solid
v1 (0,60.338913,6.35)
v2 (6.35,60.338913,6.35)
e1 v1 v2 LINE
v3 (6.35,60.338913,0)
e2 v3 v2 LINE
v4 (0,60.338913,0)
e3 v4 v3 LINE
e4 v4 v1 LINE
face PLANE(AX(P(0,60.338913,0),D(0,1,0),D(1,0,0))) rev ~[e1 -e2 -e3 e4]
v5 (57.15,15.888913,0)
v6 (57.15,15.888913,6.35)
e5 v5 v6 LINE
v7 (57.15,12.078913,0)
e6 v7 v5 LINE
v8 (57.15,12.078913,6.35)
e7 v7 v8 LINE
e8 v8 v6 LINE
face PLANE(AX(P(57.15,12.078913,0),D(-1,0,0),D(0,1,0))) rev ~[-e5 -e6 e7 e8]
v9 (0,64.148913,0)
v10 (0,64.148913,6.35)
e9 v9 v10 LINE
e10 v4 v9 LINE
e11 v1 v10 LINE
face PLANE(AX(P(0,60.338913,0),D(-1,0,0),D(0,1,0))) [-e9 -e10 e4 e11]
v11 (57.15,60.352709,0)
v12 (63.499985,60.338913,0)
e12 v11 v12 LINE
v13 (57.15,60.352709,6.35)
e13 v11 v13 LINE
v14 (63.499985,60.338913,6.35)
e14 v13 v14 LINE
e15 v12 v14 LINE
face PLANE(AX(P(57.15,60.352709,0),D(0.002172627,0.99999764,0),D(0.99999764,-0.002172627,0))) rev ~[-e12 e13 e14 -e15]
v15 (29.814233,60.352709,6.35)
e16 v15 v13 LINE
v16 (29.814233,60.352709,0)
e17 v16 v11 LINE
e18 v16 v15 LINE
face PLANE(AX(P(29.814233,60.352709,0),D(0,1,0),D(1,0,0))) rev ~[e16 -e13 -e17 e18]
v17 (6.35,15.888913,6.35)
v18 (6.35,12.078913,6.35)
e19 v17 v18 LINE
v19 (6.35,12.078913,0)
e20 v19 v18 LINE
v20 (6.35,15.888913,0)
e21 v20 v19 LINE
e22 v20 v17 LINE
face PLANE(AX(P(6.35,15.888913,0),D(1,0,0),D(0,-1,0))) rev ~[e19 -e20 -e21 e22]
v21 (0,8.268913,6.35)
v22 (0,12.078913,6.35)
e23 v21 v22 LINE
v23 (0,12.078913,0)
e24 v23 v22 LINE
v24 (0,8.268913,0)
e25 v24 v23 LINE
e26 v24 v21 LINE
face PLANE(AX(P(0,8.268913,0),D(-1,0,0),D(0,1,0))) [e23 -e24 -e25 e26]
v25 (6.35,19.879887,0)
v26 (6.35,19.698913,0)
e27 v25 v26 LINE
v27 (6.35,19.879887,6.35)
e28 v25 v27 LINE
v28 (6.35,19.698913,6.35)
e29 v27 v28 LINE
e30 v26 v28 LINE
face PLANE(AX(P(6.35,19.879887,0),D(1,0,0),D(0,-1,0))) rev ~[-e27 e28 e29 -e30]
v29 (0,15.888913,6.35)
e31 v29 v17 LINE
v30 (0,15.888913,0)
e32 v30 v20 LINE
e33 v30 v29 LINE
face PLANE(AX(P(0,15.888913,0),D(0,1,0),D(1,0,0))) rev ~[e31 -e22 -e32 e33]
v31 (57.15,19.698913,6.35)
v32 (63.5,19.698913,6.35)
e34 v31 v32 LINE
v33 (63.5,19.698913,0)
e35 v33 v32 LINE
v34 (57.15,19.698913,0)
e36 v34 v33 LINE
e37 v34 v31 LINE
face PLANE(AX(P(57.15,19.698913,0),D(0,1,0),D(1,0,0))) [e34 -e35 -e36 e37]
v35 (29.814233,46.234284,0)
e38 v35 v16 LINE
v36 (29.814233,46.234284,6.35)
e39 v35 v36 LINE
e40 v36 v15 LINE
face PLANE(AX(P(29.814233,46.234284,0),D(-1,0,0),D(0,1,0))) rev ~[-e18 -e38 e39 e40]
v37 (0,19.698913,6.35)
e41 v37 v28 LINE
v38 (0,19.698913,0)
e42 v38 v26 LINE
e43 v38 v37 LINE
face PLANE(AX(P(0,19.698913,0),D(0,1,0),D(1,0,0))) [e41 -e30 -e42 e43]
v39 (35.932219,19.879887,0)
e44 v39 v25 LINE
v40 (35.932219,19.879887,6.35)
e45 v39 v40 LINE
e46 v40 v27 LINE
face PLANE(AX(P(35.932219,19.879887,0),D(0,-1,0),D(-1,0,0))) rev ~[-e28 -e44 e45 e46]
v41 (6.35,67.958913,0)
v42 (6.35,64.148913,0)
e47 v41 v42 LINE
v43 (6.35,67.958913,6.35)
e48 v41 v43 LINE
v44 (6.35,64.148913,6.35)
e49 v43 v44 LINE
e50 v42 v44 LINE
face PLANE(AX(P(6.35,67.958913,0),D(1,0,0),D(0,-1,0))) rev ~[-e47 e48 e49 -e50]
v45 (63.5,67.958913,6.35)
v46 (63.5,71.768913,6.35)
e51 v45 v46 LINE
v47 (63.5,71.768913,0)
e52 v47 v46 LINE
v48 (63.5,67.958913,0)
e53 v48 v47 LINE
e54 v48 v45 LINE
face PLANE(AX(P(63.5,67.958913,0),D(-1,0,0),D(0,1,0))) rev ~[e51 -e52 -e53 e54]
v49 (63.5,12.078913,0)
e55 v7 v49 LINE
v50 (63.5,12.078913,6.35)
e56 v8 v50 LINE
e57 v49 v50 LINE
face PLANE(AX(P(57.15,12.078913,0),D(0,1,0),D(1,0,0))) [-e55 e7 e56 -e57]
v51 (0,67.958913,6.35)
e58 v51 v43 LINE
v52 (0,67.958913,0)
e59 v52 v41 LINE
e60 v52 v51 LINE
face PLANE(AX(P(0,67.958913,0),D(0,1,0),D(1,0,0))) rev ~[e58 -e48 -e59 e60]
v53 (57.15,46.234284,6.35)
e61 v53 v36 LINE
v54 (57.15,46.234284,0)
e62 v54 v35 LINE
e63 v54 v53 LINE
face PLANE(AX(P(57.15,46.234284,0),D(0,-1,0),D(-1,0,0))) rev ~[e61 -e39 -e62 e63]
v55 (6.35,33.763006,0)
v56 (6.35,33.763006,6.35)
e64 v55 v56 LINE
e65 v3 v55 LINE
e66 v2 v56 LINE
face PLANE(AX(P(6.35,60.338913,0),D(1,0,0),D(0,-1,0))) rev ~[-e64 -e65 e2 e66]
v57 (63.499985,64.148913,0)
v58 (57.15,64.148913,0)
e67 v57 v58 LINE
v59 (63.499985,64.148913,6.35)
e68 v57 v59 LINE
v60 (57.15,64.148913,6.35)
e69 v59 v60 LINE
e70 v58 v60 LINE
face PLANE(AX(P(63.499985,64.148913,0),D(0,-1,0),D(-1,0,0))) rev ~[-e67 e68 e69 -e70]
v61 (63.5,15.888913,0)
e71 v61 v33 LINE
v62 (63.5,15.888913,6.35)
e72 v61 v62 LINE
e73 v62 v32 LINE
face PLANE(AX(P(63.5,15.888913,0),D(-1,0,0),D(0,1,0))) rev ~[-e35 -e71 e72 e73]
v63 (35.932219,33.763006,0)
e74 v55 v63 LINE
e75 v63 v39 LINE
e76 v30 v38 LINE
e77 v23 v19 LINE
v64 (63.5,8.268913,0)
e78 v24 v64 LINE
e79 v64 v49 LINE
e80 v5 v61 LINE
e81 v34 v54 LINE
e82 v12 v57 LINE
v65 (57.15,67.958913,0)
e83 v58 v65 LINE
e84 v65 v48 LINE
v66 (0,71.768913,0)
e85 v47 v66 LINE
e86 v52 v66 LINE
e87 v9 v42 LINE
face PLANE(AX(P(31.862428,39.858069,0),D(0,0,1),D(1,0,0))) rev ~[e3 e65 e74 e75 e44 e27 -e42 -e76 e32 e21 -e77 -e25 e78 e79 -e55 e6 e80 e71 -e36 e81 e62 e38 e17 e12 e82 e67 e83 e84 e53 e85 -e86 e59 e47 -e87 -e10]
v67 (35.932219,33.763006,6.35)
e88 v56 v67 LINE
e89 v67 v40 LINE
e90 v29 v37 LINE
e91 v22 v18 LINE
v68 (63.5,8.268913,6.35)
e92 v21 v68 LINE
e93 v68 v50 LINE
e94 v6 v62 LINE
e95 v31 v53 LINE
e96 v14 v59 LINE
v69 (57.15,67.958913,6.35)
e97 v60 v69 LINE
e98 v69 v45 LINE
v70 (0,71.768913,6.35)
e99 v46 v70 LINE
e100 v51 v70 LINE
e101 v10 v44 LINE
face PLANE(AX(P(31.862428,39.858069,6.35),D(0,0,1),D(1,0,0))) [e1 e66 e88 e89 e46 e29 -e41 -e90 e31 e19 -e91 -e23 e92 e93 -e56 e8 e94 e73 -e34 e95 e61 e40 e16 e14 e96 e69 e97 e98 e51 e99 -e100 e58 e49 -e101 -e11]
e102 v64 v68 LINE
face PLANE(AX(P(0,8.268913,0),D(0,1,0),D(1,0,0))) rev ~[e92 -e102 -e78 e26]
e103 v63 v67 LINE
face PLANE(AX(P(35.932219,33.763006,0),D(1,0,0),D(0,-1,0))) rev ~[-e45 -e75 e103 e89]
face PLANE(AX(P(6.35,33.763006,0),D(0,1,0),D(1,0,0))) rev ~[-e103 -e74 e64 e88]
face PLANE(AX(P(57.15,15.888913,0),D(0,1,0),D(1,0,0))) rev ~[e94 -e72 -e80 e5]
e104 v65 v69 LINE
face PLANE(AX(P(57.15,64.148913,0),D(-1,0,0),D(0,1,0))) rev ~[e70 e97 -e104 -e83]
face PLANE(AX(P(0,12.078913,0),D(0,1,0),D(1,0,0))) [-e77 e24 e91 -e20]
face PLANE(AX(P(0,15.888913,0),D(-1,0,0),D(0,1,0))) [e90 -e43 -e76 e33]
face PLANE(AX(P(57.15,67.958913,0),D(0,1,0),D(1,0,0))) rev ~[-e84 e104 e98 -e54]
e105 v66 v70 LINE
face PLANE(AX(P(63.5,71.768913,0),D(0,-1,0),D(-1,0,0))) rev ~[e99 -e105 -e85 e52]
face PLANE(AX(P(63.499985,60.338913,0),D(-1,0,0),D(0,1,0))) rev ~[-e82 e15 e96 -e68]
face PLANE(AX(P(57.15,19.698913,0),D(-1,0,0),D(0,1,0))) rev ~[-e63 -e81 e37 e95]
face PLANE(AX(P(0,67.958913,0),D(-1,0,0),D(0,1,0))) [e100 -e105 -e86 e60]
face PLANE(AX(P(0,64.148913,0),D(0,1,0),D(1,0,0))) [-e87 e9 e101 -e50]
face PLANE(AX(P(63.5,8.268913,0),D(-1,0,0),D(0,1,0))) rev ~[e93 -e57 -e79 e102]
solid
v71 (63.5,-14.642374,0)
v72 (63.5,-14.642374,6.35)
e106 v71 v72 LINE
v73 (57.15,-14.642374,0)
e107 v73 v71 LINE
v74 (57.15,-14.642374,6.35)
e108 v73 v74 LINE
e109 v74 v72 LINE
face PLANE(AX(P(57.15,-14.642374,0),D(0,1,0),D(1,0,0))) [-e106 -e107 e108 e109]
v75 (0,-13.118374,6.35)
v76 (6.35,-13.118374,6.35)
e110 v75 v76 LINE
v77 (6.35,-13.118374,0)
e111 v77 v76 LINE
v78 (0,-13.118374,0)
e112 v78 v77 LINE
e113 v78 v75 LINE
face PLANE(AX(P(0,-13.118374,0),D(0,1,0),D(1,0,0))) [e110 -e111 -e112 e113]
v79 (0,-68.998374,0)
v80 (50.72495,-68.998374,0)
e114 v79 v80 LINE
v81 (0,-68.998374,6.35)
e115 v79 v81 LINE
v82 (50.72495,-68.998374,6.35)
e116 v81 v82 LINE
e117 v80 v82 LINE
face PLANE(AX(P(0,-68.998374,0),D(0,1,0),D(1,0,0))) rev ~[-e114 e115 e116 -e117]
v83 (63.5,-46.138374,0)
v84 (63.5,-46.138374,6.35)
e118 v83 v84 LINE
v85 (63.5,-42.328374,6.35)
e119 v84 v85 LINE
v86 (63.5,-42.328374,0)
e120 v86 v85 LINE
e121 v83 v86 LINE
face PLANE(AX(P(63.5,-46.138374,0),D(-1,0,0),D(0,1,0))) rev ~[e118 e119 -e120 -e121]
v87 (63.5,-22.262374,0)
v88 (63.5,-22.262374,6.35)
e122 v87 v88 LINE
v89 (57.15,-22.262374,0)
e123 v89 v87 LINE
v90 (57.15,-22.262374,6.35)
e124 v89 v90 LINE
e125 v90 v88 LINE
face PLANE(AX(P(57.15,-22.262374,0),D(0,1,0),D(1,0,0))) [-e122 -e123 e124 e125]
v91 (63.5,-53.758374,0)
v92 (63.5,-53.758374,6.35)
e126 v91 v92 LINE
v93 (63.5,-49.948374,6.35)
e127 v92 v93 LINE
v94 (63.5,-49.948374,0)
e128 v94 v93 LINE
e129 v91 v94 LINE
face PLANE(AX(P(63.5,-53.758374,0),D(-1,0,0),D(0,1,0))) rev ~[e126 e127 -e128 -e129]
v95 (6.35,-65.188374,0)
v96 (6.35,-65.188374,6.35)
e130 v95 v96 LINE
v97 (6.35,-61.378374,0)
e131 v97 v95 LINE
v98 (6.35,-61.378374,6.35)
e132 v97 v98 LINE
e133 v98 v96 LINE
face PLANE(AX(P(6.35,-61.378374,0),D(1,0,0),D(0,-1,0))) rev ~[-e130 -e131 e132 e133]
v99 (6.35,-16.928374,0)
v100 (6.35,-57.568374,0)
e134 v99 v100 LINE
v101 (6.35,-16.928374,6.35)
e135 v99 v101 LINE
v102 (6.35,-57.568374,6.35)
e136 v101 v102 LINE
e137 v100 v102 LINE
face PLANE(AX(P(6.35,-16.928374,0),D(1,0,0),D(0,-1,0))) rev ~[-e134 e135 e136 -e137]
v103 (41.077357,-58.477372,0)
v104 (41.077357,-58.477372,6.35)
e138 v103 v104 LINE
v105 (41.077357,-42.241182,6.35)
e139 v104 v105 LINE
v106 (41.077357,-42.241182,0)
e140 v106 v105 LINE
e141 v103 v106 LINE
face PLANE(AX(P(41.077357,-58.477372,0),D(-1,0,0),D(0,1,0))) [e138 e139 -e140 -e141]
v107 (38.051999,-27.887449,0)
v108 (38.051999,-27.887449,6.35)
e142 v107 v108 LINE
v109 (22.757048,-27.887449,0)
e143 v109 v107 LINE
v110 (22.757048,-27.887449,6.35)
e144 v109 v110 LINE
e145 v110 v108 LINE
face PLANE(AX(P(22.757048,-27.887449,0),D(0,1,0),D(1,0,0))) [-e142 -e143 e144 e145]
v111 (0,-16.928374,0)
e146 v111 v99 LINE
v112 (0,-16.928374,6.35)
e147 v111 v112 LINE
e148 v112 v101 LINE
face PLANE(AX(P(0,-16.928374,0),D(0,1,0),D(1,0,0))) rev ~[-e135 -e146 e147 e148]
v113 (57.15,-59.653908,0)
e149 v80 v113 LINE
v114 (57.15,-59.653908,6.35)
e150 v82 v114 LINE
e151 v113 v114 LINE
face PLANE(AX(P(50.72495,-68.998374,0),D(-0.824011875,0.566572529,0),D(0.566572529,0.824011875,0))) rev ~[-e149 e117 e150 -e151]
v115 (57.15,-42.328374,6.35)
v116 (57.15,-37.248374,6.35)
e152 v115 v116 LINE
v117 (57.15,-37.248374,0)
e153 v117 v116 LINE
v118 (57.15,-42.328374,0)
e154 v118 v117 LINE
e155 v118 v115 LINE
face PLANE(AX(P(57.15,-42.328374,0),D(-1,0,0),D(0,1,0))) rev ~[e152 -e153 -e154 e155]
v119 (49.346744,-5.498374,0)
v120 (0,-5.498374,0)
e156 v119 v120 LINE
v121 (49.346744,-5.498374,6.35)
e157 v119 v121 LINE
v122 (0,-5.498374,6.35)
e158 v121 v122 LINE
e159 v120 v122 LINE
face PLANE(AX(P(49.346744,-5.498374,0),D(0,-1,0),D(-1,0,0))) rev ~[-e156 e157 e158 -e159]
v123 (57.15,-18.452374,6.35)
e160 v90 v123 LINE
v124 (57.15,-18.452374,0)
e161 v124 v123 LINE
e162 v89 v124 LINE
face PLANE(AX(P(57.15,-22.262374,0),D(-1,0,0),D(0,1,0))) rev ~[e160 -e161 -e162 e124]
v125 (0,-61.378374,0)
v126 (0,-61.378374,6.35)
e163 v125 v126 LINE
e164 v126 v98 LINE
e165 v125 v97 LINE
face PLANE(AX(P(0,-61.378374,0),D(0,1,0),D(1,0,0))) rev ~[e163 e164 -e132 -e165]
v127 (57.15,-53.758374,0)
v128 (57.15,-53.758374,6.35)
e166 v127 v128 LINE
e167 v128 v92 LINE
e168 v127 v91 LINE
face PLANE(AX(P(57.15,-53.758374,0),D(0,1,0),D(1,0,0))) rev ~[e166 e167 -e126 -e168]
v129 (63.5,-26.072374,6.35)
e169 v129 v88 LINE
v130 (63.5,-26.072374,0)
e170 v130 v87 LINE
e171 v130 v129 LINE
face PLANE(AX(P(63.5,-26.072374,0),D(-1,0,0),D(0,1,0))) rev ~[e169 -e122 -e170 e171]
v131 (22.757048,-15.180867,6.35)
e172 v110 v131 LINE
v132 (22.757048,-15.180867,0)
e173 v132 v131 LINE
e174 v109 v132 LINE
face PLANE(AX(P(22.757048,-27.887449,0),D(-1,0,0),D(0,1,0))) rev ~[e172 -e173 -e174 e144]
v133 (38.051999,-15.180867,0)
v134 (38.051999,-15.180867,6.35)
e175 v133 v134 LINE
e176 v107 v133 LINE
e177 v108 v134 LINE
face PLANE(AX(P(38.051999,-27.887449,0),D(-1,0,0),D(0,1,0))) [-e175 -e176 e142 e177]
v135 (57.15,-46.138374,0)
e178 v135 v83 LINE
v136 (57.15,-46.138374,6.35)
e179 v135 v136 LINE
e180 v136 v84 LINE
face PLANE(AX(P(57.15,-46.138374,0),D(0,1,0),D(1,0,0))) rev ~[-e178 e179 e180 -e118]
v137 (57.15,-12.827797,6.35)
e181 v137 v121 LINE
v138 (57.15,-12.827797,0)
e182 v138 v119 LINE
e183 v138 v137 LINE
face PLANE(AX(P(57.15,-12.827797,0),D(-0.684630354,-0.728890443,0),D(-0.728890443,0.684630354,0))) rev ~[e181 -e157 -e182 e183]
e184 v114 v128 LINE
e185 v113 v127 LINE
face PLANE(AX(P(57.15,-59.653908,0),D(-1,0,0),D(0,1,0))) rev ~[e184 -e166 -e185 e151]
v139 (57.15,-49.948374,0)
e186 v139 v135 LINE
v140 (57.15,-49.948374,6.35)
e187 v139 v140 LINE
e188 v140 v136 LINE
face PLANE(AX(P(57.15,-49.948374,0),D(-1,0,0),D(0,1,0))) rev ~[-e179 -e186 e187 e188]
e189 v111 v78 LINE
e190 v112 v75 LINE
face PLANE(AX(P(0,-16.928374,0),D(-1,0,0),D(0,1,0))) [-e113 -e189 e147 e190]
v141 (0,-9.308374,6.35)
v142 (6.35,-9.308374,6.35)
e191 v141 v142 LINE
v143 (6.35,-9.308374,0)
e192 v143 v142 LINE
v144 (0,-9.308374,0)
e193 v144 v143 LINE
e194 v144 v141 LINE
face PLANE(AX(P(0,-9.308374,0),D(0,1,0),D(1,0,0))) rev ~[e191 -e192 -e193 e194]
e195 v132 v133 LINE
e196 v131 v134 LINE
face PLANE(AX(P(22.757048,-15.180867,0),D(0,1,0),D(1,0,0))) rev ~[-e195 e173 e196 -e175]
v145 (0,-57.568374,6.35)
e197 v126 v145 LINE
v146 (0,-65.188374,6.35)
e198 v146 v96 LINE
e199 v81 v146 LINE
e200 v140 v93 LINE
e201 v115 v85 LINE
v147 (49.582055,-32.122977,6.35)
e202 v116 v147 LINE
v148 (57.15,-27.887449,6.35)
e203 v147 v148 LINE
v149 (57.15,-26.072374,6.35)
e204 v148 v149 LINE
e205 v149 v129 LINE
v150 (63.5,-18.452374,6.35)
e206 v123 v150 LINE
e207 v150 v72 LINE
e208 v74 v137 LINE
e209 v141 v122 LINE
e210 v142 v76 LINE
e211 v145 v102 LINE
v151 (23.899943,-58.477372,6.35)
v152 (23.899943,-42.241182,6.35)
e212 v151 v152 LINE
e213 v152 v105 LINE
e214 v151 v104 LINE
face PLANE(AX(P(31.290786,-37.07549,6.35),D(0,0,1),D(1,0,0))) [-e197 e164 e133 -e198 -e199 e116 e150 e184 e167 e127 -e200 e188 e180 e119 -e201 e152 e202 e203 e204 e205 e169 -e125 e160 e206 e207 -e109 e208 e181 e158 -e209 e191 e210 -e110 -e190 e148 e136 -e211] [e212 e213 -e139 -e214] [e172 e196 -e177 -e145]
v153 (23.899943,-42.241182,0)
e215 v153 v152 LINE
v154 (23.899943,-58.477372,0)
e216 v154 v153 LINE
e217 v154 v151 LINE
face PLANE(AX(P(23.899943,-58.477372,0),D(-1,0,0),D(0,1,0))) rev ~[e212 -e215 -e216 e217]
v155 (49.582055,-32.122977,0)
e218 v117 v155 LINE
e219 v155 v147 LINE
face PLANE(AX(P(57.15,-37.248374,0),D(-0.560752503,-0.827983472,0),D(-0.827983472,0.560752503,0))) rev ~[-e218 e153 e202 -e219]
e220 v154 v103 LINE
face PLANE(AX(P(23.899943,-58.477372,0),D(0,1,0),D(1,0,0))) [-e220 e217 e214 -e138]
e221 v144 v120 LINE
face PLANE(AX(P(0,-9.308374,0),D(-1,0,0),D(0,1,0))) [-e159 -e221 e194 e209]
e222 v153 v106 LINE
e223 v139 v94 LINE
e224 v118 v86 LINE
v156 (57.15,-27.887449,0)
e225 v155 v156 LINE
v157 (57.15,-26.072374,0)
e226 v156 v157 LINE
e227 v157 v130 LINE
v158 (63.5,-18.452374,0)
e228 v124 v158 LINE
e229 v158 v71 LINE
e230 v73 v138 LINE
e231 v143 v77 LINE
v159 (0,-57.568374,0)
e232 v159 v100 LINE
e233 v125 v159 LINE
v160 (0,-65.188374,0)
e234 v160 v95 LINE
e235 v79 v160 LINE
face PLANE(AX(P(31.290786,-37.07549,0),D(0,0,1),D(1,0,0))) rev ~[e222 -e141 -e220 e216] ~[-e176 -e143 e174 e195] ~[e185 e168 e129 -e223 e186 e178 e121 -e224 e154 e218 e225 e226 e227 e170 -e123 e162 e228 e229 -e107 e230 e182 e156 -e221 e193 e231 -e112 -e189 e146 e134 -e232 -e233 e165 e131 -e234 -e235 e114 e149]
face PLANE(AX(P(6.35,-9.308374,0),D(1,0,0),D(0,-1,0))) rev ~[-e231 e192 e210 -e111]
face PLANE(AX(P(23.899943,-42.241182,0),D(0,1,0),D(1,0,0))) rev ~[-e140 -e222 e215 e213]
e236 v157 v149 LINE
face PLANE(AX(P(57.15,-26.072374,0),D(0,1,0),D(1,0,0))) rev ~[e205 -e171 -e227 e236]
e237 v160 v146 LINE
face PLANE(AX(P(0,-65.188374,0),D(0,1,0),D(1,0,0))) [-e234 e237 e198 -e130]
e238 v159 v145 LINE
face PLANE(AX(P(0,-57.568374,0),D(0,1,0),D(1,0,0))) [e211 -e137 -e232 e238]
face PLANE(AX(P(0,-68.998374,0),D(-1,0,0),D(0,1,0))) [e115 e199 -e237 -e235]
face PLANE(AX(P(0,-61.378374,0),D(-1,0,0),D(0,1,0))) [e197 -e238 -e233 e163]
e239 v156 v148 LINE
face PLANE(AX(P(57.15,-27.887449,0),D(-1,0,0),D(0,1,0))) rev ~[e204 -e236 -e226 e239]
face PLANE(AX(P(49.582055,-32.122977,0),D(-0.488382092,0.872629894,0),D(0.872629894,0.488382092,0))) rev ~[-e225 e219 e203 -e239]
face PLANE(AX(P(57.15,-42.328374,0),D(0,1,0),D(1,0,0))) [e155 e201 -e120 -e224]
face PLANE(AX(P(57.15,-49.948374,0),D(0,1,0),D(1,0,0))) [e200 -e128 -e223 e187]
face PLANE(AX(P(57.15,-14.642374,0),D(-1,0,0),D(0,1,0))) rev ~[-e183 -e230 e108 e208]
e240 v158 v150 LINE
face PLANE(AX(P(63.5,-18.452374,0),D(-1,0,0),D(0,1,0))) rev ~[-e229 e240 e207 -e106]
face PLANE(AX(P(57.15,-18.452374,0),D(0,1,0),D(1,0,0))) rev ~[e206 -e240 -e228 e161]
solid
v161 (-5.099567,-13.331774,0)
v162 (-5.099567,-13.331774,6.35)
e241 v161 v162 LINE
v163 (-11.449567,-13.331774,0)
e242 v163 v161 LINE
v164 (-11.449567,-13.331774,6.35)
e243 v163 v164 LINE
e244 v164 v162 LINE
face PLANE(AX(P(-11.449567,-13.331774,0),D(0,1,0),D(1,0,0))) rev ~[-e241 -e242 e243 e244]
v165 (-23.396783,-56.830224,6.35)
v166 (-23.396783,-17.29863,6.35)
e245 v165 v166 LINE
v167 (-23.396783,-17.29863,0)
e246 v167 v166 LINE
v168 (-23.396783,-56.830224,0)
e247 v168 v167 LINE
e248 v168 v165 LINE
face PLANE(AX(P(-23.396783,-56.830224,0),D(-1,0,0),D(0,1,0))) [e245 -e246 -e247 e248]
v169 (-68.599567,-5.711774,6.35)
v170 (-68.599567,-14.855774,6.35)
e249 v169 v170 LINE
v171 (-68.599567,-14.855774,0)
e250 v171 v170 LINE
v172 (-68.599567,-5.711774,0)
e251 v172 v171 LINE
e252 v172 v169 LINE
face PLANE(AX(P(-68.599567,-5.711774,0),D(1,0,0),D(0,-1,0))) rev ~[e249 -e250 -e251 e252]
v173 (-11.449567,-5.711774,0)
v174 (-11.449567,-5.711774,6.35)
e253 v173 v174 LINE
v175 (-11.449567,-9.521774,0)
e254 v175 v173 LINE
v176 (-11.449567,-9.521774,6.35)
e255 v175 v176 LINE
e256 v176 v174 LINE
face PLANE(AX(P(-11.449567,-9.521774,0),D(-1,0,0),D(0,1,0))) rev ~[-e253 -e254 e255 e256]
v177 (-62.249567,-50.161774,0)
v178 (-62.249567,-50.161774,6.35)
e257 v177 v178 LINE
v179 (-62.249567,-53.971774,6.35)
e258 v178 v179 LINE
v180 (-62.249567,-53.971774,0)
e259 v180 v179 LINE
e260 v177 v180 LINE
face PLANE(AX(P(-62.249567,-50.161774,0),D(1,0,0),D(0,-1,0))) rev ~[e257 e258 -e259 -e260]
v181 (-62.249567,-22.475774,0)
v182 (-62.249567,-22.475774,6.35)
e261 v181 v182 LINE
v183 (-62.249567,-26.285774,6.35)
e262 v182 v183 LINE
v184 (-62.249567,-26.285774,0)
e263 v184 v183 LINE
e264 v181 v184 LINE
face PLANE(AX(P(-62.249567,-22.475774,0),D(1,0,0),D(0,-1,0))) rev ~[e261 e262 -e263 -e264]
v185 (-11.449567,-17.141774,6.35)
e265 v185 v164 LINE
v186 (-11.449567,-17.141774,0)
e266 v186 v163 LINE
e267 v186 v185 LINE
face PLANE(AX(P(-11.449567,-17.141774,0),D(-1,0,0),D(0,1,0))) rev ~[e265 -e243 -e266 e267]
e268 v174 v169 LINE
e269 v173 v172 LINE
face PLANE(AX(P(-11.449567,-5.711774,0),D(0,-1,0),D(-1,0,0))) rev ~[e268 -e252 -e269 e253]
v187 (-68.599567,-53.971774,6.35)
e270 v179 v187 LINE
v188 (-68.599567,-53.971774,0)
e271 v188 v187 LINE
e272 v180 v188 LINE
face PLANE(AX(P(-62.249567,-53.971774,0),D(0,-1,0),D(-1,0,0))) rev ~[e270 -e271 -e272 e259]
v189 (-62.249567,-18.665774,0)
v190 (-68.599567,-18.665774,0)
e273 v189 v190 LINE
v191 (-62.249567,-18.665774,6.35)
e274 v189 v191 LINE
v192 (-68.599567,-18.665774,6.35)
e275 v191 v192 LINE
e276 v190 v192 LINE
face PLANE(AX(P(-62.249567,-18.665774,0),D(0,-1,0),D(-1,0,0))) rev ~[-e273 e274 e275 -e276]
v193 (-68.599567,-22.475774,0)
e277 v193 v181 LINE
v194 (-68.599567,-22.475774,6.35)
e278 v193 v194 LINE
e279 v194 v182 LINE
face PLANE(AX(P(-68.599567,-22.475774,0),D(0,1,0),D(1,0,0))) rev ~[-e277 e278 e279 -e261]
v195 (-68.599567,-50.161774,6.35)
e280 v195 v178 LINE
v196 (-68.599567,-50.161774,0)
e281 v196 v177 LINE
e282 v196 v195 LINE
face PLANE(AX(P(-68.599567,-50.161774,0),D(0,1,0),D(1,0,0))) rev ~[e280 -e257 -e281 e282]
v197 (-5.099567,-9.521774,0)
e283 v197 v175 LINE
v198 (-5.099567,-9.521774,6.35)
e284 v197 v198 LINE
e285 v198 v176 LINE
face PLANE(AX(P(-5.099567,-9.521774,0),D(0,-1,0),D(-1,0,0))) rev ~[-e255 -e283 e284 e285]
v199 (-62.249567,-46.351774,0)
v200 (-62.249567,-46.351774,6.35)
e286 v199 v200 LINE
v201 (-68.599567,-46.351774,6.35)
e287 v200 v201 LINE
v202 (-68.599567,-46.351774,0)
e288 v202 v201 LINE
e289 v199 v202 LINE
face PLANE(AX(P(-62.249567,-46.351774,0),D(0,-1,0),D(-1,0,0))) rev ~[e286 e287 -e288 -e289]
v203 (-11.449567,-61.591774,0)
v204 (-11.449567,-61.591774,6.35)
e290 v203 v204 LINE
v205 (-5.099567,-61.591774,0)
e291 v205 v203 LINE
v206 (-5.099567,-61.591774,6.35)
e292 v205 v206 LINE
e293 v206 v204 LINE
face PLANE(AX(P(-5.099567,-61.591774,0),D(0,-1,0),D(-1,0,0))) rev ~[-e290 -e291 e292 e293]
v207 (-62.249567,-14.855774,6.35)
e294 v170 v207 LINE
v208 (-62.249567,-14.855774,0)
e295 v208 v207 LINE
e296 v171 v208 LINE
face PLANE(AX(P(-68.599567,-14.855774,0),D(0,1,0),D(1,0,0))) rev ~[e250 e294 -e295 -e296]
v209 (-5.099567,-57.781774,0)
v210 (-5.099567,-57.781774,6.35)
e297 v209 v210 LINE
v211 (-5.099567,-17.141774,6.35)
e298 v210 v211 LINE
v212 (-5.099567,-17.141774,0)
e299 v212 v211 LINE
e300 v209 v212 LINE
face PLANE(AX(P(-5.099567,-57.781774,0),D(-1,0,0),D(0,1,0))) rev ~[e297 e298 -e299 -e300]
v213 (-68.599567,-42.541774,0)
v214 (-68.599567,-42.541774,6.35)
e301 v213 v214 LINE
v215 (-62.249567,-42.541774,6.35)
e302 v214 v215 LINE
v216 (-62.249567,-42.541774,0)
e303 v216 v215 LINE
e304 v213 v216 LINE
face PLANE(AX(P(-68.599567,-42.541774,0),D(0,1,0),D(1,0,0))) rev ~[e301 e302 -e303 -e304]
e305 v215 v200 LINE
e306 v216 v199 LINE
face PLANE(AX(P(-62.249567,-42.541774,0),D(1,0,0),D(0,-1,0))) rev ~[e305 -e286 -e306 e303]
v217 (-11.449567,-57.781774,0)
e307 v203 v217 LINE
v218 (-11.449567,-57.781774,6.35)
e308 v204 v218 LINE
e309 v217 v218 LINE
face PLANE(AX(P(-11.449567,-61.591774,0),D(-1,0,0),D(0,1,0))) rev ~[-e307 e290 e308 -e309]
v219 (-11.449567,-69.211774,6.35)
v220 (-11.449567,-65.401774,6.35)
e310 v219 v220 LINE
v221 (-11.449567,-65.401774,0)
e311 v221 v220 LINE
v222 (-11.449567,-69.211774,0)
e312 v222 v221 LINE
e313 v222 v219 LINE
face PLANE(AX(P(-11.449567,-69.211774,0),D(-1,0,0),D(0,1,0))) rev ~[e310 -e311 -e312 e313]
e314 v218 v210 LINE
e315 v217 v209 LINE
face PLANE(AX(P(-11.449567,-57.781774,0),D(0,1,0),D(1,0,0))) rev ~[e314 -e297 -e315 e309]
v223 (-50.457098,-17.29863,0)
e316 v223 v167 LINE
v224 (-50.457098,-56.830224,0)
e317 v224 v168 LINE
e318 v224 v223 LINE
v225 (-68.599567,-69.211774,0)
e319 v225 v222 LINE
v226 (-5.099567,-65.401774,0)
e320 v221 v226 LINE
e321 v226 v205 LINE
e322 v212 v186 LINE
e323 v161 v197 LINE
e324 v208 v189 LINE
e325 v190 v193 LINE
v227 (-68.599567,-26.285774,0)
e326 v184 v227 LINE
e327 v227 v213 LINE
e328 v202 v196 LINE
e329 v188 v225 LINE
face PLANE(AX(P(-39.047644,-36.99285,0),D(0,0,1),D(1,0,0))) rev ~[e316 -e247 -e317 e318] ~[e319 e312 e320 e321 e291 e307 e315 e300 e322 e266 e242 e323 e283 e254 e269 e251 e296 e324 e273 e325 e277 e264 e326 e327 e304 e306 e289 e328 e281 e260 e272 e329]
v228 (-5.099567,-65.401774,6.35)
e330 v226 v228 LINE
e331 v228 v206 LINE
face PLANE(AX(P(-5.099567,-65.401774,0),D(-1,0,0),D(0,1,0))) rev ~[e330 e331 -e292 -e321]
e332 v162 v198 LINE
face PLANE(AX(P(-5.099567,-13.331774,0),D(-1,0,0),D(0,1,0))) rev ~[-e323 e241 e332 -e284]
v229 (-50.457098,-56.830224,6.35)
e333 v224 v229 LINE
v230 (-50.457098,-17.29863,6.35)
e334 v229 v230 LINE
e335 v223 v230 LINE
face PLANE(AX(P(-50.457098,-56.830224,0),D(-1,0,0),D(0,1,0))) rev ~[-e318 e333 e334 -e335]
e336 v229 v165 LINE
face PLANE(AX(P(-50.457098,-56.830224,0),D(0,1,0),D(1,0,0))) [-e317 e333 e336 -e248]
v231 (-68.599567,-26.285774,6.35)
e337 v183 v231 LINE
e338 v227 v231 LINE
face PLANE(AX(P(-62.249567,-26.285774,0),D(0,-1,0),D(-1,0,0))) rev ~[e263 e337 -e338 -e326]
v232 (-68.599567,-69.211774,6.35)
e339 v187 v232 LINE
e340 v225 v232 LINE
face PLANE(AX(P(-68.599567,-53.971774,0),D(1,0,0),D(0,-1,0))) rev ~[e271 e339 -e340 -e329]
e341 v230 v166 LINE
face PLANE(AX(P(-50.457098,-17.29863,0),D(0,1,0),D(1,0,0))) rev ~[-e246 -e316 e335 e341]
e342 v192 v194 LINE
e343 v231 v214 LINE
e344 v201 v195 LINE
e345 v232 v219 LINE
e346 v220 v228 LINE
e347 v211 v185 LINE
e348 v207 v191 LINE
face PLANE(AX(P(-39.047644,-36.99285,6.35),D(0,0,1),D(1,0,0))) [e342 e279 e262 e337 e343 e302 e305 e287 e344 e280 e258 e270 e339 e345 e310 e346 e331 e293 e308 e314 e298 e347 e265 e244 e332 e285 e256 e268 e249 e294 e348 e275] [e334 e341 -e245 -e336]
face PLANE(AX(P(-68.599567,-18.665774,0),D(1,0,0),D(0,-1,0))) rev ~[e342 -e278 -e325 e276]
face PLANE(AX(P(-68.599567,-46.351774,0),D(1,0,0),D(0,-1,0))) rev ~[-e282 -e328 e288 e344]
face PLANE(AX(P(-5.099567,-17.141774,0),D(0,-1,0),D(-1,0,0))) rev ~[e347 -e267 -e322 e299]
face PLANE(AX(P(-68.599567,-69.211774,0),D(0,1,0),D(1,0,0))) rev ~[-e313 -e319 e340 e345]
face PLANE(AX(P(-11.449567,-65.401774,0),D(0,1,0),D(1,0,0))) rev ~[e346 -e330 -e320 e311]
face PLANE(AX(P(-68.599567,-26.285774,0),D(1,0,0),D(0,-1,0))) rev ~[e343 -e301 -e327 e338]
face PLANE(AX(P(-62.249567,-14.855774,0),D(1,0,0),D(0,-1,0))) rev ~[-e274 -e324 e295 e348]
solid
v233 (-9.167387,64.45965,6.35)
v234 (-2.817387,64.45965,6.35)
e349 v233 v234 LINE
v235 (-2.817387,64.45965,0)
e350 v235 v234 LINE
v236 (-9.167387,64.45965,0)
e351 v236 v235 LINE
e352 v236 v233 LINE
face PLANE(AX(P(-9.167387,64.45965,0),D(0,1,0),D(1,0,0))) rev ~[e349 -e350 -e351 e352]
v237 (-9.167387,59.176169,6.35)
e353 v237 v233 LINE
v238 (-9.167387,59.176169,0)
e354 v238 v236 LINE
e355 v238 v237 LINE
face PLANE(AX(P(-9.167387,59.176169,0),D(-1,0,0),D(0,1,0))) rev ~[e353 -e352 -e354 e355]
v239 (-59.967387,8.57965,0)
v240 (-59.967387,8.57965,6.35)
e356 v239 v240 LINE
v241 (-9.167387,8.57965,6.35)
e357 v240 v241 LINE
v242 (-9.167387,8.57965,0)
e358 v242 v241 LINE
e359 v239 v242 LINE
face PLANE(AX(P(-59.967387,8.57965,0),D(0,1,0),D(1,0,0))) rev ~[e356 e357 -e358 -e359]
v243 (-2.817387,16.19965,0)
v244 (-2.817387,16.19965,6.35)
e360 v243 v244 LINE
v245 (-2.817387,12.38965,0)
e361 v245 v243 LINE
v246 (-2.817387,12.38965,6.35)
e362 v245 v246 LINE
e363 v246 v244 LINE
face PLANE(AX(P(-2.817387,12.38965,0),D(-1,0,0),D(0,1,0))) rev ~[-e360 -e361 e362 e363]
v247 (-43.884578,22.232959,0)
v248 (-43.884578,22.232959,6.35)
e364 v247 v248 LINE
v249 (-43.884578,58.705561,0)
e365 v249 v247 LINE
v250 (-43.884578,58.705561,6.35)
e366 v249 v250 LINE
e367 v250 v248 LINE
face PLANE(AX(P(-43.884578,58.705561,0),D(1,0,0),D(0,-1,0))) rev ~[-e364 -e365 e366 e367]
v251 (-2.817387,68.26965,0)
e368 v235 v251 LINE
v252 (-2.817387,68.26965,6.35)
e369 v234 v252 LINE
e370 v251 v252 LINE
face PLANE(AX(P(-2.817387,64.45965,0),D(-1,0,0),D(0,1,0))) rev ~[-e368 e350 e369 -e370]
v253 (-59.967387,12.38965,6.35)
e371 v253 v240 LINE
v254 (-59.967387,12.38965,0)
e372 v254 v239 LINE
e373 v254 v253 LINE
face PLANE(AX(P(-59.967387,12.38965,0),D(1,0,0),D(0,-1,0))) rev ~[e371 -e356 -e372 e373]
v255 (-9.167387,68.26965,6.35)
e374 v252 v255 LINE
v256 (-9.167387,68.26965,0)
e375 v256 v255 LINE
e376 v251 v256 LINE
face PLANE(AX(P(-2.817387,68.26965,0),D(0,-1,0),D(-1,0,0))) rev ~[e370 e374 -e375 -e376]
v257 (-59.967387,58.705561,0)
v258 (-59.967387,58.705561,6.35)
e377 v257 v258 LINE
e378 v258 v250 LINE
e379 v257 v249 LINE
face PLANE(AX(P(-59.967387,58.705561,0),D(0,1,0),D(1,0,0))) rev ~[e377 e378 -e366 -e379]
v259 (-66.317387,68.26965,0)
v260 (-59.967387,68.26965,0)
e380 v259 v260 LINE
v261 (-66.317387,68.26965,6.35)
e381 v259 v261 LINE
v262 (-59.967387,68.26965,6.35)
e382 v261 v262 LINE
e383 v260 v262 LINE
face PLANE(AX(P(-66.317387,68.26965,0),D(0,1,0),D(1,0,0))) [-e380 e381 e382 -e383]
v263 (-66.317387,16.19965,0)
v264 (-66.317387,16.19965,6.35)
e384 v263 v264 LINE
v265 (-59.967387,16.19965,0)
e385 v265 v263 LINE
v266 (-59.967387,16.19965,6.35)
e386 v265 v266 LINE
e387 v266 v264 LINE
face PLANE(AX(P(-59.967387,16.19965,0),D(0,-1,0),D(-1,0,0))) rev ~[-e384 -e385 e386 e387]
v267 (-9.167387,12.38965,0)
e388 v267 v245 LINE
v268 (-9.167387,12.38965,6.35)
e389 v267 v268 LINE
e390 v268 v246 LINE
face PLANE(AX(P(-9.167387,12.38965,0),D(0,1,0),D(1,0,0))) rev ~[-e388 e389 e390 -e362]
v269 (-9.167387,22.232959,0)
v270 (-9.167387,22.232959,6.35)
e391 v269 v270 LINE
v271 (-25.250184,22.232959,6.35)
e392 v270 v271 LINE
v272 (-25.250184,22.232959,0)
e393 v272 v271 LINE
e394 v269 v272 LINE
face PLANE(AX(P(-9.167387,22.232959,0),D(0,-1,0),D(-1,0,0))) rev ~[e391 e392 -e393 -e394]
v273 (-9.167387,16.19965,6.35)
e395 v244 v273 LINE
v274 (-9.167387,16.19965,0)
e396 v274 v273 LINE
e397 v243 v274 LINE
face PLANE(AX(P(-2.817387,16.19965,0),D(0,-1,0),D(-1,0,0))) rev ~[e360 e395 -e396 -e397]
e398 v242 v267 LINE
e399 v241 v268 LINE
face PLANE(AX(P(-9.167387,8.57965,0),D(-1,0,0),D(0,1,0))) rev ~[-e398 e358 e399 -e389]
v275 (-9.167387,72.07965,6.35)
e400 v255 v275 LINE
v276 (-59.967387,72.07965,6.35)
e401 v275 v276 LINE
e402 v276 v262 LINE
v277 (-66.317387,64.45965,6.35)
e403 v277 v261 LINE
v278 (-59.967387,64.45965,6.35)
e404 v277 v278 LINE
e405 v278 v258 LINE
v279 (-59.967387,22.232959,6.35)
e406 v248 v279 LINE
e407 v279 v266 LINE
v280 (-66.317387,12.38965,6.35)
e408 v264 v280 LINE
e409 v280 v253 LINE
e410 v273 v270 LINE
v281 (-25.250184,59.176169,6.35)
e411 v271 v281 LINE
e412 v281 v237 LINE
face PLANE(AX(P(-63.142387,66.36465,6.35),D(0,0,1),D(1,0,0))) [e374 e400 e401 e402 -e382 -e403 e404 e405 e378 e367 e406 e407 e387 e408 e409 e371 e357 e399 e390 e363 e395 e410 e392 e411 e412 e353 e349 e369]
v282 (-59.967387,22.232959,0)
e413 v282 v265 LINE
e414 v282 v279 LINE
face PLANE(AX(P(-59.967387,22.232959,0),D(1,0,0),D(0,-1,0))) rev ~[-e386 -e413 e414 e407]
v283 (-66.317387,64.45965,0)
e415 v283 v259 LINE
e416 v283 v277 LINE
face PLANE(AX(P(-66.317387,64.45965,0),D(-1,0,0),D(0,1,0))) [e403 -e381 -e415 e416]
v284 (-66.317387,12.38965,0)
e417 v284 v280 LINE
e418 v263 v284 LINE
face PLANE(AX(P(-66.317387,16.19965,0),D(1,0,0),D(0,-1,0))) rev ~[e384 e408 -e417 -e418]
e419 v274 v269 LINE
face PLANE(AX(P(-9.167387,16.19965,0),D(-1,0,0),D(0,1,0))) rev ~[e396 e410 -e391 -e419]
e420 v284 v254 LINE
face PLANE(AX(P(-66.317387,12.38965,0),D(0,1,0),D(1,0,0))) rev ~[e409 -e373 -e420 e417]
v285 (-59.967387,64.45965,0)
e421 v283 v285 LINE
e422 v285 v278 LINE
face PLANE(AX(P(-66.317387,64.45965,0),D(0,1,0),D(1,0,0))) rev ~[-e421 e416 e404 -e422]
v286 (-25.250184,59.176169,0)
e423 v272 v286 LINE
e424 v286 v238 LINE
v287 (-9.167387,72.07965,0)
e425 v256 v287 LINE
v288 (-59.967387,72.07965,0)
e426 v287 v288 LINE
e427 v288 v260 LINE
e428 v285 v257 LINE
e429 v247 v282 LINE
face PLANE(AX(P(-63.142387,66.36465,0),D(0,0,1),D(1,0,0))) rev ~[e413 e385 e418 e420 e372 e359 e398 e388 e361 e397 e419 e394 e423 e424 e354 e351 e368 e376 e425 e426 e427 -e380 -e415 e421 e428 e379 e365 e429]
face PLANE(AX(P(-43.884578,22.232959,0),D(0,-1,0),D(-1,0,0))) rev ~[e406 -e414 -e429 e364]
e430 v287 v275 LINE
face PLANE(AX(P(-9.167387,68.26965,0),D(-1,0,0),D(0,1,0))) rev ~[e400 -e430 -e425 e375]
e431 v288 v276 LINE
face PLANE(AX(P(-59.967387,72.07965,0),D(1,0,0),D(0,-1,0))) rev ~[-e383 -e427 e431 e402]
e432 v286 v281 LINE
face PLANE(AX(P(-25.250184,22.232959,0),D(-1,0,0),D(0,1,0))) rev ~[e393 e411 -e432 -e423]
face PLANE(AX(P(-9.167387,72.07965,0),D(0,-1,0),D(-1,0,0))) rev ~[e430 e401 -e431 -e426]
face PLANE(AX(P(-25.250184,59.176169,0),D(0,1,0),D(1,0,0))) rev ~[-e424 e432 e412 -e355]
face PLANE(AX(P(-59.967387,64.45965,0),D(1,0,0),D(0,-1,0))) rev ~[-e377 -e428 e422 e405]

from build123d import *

# Parameters (mm, degrees)
F0_W     = 6.35
F0_H     = 3.81
F4_DEPTH = 6.35
F3_W     = 17.177414149
F3_H     = 16.2361897528
F3_W_2   = 15.2949504554
F3_H_2   = 12.7065815032
F3_W_3   = 6.35
F3_H_3   = 3.81
F5_DEPTH = 6.35
F1_W     = 6.35
F1_H     = 3.81
F6_DEPTH = 6.35
F2_W     = 27.0603150129
F2_H     = 39.5315941423
F7_DEPTH = 6.35


# Not quite as in the source:
# - a feature names something its author has since deleted; it is built from what else it names


with BuildPart() as f4:
    # F0 (on Top) → F4 (new body)
    with BuildSketch(Plane.XY):
        Polygon((57.15, 71.7689129657), (6.35, 71.7689129657), (6.35, 67.9589129657), (6.35, 64.1489129657), (6.35, 60.3389129657), (6.35, 33.7630063295), (35.9322190344, 33.7630063295), (35.9322190344, 19.8798868805), (6.35, 19.8798868805), (6.35, 19.6989129657), (6.35, 15.8889129657), (6.35, 12.0789129657), (6.35, 8.2689129657), (57.15, 8.2689129657), (57.15, 12.0789129657), (57.15, 15.8889129657), (57.15, 19.6989129657), (57.15, 46.2342835963), (29.8142325193, 46.2342835963), (29.8142325193, 60.3527091444), (57.15, 60.3527091444), (57.15, 64.1489129657), (57.15, 67.9589129657), align=None)
        with Locations((3.175, 69.8639129657)):
            Rectangle(F0_W, F0_H)
        with Locations((3.175, 62.2439129657)):
            Rectangle(F0_W, F0_H)
        with Locations((3.175, 17.7939129657)):
            Rectangle(F0_W, F0_H)
        with Locations((3.175, 10.1739129657)):
            Rectangle(F0_W, F0_H)
        with Locations((60.325, 69.8639129657)):
            Rectangle(F0_W, F0_H)
        Polygon((63.499985013, 64.1489129657), (57.15, 64.1489129657), (57.15, 60.3527091444), (63.499985013, 60.3389129657), align=None)
        with Locations((60.325, 17.7939129657)):
            Rectangle(F0_W, F0_H)
        with Locations((60.325, 10.1739129657)):
            Rectangle(F0_W, F0_H)
    extrude(amount=F4_DEPTH)


with BuildPart() as f5:
    # F3 (on Top) → F5 (new body)
    with BuildSketch(Plane.XY):
        Polygon((49.34674353, -5.4983740449), (6.35, -5.4983740449), (6.35, -9.3083740449), (6.35, -13.1183740449), (6.35, -16.9283740449), (6.35, -57.5683740449), (6.35, -61.3783740449), (6.35, -65.1883740449), (6.35, -68.9983740449), (50.7249496877, -68.9983740449), (57.15, -59.6539080143), (57.15, -53.7583740449), (57.15, -49.9483740449), (57.15, -46.1383740449), (57.15, -42.3283740449), (57.15, -37.2483740449), (49.582055217, -32.122977078), (57.15, -27.8874486685), (57.15, -26.0723740449), (57.15, -22.2623740449), (57.15, -18.4523740449), (57.15, -14.6423740449), (57.15, -12.8277968615), align=None)
        with Locations((32.488649711, -50.3592770547)):
            Rectangle(F3_W, F3_H, mode=Mode.SUBTRACT)
        with Locations((30.4045233935, -21.5341579169)):
            Rectangle(F3_W_2, F3_H_2, mode=Mode.SUBTRACT)
        with Locations((3.175, -7.4033740449)):
            Rectangle(F3_W_3, F3_H_3)
        with Locations((3.175, -15.0233740449)):
            Rectangle(F3_W_3, F3_H_3)
        with Locations((3.175, -59.4733740449)):
            Rectangle(F3_W_3, F3_H_3)
        with Locations((3.175, -67.0933740449)):
            Rectangle(F3_W_3, F3_H_3)
        with Locations((60.325, -16.5473740449)):
            Rectangle(F3_W_3, F3_H_3)
        with Locations((60.325, -24.1673740449)):
            Rectangle(F3_W_3, F3_H_3)
        with Locations((60.325, -44.2333740449)):
            Rectangle(F3_W_3, F3_H_3)
        with Locations((60.325, -51.8533740449)):
            Rectangle(F3_W_3, F3_H_3)
    extrude(amount=F5_DEPTH)


with BuildPart() as f6:
    # F1 (on Top) → F6 (new body)
    with BuildSketch(Plane.XY):
        with Locations((-63.1423869252, 66.3646499625)):
            Rectangle(F1_W, F1_H)
        Polygon((-9.1673869252, 72.0796499625), (-59.9673869252, 72.0796499625), (-59.9673869252, 68.2696499625), (-59.9673869252, 64.4596499625), (-59.9673869252, 60.6496499625), (-59.9673869252, 58.705560863), (-43.8845783249, 58.705560863), (-43.8845783249, 22.232959047), (-59.9673869252, 22.232959047), (-59.9673869252, 20.0096499625), (-59.9673869252, 16.1996499625), (-66.3173869252, 16.1996499625), (-66.3173869252, 12.3896499625), (-59.9673869252, 12.3896499625), (-59.9673869252, 8.5796499625), (-9.1673869252, 8.5796499625), (-9.1673869252, 12.3896499625), (-2.8173869252, 12.3896499625), (-2.8173869252, 16.1996499625), (-9.1673869252, 16.1996499625), (-9.1673869252, 20.0096499625), (-9.1673869252, 22.232959047), (-25.2501843252, 22.232959047), (-25.2501843252, 59.1761693358), (-9.1673869252, 59.1761693358), (-9.1673869252, 60.6496499625), (-9.1673869252, 64.4596499625), (-2.8173869252, 64.4596499625), (-2.8173869252, 68.2696499625), (-9.1673869252, 68.2696499625), align=None)
    extrude(amount=F6_DEPTH)


with BuildPart() as f7:
    # F2 (on Top) → F7 (new body)
    with BuildSketch(Plane.XY):
        Polygon((-11.4495668173, -5.7117735744), (-68.5995668173, -5.7117735744), (-68.5995668173, -14.8557735744), (-62.2495668173, -14.8557735744), (-62.2495668173, -18.6657735744), (-68.5995668173, -18.6657735744), (-68.5995668173, -22.4757735744), (-62.2495668173, -22.4757735744), (-62.2495668173, -26.2857735744), (-68.5995668173, -26.2857735744), (-68.5995668173, -42.5417735744), (-62.2495668173, -42.5417735744), (-62.2495668173, -46.3517735744), (-68.5995668173, -46.3517735744), (-68.5995668173, -50.1617735744), (-62.2495668173, -50.1617735744), (-62.2495668173, -53.9717735744), (-68.5995668173, -53.9717735744), (-68.5995668173, -69.2117735744), (-11.4495668173, -69.2117735744), (-11.4495668173, -65.4017735744), (-5.0995668173, -65.4017735744), (-5.0995668173, -61.5917735744), (-11.4495668173, -61.5917735744), (-11.4495668173, -57.7817735744), (-5.0995668173, -57.7817735744), (-5.0995668173, -17.1417735744), (-11.4495668173, -17.1417735744), (-11.4495668173, -13.3317735744), (-5.0995668173, -13.3317735744), (-5.0995668173, -9.5217735744), (-11.4495668173, -9.5217735744), align=None)
        with Locations((-36.9269400835, -37.0644265786)):
            Rectangle(F2_W, F2_H, mode=Mode.SUBTRACT)
    extrude(amount=F7_DEPTH)


solid = Compound([f4.part, f5.part, f6.part, f7.part])
